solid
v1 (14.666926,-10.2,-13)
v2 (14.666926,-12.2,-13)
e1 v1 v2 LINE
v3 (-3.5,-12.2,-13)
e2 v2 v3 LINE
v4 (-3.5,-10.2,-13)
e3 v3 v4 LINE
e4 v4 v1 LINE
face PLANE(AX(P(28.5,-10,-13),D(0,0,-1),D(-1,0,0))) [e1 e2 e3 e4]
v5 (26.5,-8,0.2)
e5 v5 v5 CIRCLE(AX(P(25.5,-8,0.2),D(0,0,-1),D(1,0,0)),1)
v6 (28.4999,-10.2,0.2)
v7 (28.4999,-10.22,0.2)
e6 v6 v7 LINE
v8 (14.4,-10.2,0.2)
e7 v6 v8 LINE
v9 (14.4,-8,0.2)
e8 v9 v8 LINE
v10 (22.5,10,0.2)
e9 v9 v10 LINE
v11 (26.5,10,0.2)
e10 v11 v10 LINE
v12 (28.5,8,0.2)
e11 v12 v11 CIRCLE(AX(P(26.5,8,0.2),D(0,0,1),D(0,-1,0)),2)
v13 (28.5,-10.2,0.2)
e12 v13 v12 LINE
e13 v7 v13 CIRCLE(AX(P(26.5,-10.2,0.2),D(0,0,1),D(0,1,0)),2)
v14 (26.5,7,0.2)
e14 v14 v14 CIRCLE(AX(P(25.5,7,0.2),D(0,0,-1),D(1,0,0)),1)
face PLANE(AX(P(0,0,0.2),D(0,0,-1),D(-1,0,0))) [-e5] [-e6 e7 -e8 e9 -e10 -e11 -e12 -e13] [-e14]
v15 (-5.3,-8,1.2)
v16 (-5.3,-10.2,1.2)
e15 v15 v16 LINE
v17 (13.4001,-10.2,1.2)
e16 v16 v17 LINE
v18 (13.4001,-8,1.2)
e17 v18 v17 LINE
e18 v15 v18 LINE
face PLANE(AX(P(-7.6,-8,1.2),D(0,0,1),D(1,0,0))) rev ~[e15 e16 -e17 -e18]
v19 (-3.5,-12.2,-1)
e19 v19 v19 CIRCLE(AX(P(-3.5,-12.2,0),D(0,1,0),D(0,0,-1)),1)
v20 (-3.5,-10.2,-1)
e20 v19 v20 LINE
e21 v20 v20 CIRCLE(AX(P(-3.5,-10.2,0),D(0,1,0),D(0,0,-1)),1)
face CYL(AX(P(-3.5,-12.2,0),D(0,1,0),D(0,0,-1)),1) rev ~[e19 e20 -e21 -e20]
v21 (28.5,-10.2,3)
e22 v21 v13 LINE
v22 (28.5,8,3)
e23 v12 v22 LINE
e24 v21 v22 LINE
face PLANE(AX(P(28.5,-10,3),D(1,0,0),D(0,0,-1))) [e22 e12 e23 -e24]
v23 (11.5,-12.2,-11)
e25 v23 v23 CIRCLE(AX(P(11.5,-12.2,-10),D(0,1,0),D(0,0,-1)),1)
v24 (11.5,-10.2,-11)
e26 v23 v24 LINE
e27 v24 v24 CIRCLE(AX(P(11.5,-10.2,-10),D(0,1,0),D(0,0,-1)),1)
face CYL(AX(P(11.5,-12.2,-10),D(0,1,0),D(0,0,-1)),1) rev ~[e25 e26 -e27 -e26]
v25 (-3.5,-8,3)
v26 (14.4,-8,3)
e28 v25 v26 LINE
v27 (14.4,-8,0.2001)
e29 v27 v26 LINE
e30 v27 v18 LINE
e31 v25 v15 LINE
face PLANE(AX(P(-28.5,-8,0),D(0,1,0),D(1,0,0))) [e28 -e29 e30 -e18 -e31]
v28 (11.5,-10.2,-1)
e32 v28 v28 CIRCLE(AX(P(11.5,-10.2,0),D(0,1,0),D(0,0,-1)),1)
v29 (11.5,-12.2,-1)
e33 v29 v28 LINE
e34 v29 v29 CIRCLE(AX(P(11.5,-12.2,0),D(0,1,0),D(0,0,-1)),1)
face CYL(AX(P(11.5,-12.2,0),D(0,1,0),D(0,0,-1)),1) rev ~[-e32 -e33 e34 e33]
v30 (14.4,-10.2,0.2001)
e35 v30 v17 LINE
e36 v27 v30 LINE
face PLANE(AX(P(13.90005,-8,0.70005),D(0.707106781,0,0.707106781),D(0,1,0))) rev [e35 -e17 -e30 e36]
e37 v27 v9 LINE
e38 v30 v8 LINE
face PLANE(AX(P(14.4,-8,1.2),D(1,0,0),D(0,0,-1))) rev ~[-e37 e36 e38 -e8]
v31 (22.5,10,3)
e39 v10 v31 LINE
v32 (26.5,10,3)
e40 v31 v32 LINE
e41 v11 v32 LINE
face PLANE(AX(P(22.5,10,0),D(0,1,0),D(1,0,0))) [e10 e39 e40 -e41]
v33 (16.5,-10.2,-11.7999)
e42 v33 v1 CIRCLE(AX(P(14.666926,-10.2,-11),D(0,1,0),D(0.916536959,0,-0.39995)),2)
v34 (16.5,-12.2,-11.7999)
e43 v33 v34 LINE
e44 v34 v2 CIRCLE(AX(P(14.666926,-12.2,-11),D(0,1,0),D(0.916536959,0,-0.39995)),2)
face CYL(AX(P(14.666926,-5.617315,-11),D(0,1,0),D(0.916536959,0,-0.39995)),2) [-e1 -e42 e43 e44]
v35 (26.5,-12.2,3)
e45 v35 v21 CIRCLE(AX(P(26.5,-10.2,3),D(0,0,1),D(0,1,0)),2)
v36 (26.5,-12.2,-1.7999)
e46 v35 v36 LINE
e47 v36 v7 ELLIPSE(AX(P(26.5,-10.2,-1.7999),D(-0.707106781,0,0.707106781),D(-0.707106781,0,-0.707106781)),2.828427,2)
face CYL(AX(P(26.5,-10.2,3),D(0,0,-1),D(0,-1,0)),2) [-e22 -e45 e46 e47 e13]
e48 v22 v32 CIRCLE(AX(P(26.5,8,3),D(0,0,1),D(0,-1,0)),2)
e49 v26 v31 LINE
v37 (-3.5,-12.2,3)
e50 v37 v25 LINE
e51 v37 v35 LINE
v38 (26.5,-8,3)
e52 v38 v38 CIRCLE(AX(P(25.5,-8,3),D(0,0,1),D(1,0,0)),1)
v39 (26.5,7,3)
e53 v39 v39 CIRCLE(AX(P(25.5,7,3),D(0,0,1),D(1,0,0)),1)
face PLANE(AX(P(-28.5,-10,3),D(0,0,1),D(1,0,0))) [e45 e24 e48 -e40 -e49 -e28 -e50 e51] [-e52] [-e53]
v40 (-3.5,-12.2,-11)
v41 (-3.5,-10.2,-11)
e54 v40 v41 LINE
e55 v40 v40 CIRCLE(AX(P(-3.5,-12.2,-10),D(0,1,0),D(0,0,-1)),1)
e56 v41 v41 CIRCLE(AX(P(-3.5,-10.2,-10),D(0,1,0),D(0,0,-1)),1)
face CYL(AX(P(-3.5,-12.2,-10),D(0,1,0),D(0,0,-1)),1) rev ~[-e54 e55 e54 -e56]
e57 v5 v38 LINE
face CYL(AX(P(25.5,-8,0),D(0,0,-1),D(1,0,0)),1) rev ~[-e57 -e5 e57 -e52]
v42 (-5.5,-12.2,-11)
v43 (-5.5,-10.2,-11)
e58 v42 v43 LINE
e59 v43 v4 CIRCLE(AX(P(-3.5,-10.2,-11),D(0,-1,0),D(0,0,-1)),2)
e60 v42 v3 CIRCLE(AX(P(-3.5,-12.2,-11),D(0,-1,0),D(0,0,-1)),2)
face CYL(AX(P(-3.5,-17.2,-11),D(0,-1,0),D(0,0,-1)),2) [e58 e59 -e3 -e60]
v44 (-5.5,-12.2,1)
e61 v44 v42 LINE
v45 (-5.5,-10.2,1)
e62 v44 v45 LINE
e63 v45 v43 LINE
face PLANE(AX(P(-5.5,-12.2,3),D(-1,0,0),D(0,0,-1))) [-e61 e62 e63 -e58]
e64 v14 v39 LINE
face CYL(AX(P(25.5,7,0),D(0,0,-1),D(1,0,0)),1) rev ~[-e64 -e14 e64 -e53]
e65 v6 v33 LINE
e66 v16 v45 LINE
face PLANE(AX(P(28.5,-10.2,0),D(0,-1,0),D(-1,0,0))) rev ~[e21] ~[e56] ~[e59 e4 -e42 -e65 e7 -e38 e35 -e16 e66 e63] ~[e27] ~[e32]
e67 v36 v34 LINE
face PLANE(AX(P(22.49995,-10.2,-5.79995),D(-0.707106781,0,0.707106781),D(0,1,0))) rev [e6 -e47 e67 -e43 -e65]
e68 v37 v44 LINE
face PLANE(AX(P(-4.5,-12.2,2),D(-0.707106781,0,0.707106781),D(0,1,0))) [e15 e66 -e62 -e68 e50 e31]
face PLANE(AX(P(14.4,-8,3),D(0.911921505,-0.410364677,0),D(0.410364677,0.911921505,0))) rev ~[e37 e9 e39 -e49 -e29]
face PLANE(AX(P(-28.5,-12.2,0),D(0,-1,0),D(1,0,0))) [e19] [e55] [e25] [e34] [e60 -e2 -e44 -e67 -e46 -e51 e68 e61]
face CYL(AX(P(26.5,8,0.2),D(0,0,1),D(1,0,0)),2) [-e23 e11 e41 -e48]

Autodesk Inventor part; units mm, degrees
ref_plane "YZ Plane" through (0, 0, 0) normal (1, 0, 0) x (0, 1, 0)
ref_plane "XZ Plane" through (0, 0, 0) normal (0, 1, 0) x (-1, 0, 0)
ref_plane "XY Plane" through (0, 0, 0) normal (0, 0, 1) x (1, 0, 0)
sketch "Sketch1" plane through (0, 0, 0) normal (0, 0, 1) x (1, 0, 0)
  line L0 (22.5, 10) -> (28.5, 10)
  line L1 (28.5, 10) -> (28.5, -10)
  line L2 (28.5, -10) -> (22.5, -10)
  line L3 (22.5, -10) -> (22.5, 10)
  line L4 (22.5, -10) -> (-28.5, -10)
  line L5 (-28.5, -10) -> (-28.5, -8)
  line L6 (-28.5, -8) -> (22.5, -8)
  line L7 (22.5, -8) -> (22.5, -10)
  circle A0 centre (25.5, 7) radius 1
  circle A1 centre (25.5, -8) radius 1
  point P0 (0, 0)
  dimension "d0" = 57
  dimension "d1" = 2
  dimension "d2" = 28.5
  dimension "d3" = 20
  dimension "d4" = 10
  dimension "d5" = 54
  dimension "d6" = 54
  dimension "d7" = 2
  dimension "d8" = 17
  dimension "d9" = 3
  dimension "d10" = 3
  dimension "d11" = 2
  dimension "d12" = 2
extrude "Extrusion1" add sketch "Sketch1" along normal blind 3
sketch "Sketch2" plane through (0, 0, 3) normal (0, 0, 1) x (1, 0, 0)
  line L0 (-28.5, -10) -> (28.5, -10) projected
  line L1 (28.5, 10) -> (22.5, 10) projected
  line L2 (13.5, -10) -> (22.5, 10)
  line L3 (22.5, -8) -> (-28.5, -8) projected
  line L4 (22.5, 10) -> (22.5, -8)
  line L5 (22.5, -8) -> (13.5, -10)
  point P0 (0, 0)
  point P1 (14.4, -8)
  dimension "d15" = 42
extrude "Extrusion2" add sketch "Sketch2" against normal blind 3 contours L2 L4 L3
sketch "Sketch4" plane through (-28.5, -10, 0) normal (0, -1, 0) x (1, 0, 0)
  line L0 (0, 3) -> (57, 3) projected
  line L1 (0, 3) -> (57, 3)
  line L2 (57, 3) -> (57, -13)
  line L3 (57, -13) -> (0, -13)
  line L4 (0, -13) -> (0, 3)
  line L5 (57, 0) -> (57, 3) projected
  point P0 (28.5, 0)
  dimension "d22" = 16
extrude "Extrusion4" add sketch "Sketch4" along normal blind 2.2
sketch "Sketch5" plane through (-28.5, -10, 0) normal (0, 1, 0) x (1, 0, 0)
  line L0 (0, 0) -> (57, 0) projected
  line L1 (0, 13) -> (57, 13) projected
  line L2 (0, 0) -> (57, 0)
  line L3 (57, 0) -> (57, 13)
  line L4 (57, 13) -> (0, 13)
  line L5 (0, 13) -> (0, 0)
  point P0 (28.5, 0)
extrude "Extrusion5" cut sketch "Sketch5" against normal blind 0.2
sketch "Sketch6" plane through (0, 0, 0) normal (0, 0, -1) x (-1, 0, 0)
  line L0 (-28.5, 10) -> (-28.5, -12.2) projected
  line L1 (-28.5, -10.2) -> (28.5, -10.2) projected
  line L2 (-28.5, 10) -> (28.5, 10)
  line L3 (28.5, 10) -> (28.5, -10.2)
  line L4 (28.5, -10.2) -> (-28.5, -10.2)
  line L5 (-28.5, -10.2) -> (-28.5, 10)
  point P0 (0, 0)
extrude "Extrusion6" cut sketch "Sketch6" against normal blind 0.2
sketch "Sketch7" plane through (-28.5, -12.2, 0) normal (0, -1, 0) x (1, 0, 0)
  line L0 (0, 3) -> (0, -13) projected
  line L1 (57, 3) -> (0, 3) projected
  point P0 (28.5, 0)
  point P1 (25, 0)
  point P2 (25, -10)
  point P3 (40, 0)
  point P4 (40, -10)
  dimension "d29" = 25
  dimension "d30" = 40
  dimension "d31" = 25
  dimension "d32" = 40
  dimension "d33" = 10
  dimension "d34" = 10
  dimension "d35" = 3
  dimension "d36" = 3
hole "Hole1" at (-3.5, -12.2, 0) at (-3.5, -12.2, -10) at (11.5, -12.2, 0) at (11.5, -12.2, -10) direction (0, 1, 0) diameter 2 depth 5 tip angle 118
sketch "Sketch8" plane through (-28.5, -8, 3) normal (0, 1, 0) x (1, 0, 0)
  line L0 (42.9, 2.8) -> (40.9798, 2.8) projected
  line L1 (42.9, 2.8) -> (20.9, 2.8)
  line L2 (20.9, 2.8) -> (20.9, 1.8)
  line L3 (20.9, 1.8) -> (42.9, 1.8)
  line L4 (42.9, 1.8) -> (42.9, 2.8)
  point P0 (28.5, 3)
  dimension "d44" = 22
  dimension "d45" = 1
extrude "Extrusion7" cut sketch "Sketch8" against normal blind 2.2
chamfer "Chamfer1" distance 1 angle 45 2 edges at (-7.6, -9.1, 0.2) (14.4, -9.1, 1.2)
sketch "Sketch9" plane through (-28.5, -12.2, 0) normal (0, -1, 0) x (1, 0, 0)
  line L0 (0, 3) -> (0, -13) projected
  line L1 (0, -13) -> (57, -13) projected
  line L2 (0, 3) -> (23, 3)
  line L3 (23, 3) -> (23, -13)
  line L4 (23, -13) -> (0, -13)
  line L5 (0, -13) -> (0, 3)
  point P0 (28.5, 0)
  dimension "d51" = 23
extrude "Extrusion8" cut sketch "Sketch9" against normal blind 5
chamfer "Chamfer2" distance 2 angle 45 1 edges at (-5.5, -10.1, 3)
sketch "Sketch10" plane through (-28.5, -10.2, 0) normal (0, 1, 0) x (1, 0, 0)
  line L0 (57, -0.2) -> (51, -0.2) projected
  line L1 (23, 13) -> (57, 13) projected
  line L2 (57, -0.2) -> (45, -0.2)
  line L3 (45, -0.2) -> (45, 13)
  line L4 (45, 13) -> (57, 13)
  line L5 (57, 13) -> (57, -0.2)
  circle A0 centre (40, 0) radius 1 projected
  point P0 (28.5, 0)
  dimension "d57" = 5
extrude "Extrusion9" cut sketch "Sketch10" against normal blind 3 contours L0 L2 L3 L1 L5
chamfer "Chamfer3" distance 12 angle 45 1 edges at (16.5, -11.2, 0.2)
fillet "Fillet2" radius 2 2 edges at (16.5, -11.2, -13) (-5.5, -11.2, -13)
fillet "Fillet3" radius 2 2 edges at (28.5, 10, 1.6) (28.5, -12.2, 1.6)
properties part number "bridge_structure_B"
